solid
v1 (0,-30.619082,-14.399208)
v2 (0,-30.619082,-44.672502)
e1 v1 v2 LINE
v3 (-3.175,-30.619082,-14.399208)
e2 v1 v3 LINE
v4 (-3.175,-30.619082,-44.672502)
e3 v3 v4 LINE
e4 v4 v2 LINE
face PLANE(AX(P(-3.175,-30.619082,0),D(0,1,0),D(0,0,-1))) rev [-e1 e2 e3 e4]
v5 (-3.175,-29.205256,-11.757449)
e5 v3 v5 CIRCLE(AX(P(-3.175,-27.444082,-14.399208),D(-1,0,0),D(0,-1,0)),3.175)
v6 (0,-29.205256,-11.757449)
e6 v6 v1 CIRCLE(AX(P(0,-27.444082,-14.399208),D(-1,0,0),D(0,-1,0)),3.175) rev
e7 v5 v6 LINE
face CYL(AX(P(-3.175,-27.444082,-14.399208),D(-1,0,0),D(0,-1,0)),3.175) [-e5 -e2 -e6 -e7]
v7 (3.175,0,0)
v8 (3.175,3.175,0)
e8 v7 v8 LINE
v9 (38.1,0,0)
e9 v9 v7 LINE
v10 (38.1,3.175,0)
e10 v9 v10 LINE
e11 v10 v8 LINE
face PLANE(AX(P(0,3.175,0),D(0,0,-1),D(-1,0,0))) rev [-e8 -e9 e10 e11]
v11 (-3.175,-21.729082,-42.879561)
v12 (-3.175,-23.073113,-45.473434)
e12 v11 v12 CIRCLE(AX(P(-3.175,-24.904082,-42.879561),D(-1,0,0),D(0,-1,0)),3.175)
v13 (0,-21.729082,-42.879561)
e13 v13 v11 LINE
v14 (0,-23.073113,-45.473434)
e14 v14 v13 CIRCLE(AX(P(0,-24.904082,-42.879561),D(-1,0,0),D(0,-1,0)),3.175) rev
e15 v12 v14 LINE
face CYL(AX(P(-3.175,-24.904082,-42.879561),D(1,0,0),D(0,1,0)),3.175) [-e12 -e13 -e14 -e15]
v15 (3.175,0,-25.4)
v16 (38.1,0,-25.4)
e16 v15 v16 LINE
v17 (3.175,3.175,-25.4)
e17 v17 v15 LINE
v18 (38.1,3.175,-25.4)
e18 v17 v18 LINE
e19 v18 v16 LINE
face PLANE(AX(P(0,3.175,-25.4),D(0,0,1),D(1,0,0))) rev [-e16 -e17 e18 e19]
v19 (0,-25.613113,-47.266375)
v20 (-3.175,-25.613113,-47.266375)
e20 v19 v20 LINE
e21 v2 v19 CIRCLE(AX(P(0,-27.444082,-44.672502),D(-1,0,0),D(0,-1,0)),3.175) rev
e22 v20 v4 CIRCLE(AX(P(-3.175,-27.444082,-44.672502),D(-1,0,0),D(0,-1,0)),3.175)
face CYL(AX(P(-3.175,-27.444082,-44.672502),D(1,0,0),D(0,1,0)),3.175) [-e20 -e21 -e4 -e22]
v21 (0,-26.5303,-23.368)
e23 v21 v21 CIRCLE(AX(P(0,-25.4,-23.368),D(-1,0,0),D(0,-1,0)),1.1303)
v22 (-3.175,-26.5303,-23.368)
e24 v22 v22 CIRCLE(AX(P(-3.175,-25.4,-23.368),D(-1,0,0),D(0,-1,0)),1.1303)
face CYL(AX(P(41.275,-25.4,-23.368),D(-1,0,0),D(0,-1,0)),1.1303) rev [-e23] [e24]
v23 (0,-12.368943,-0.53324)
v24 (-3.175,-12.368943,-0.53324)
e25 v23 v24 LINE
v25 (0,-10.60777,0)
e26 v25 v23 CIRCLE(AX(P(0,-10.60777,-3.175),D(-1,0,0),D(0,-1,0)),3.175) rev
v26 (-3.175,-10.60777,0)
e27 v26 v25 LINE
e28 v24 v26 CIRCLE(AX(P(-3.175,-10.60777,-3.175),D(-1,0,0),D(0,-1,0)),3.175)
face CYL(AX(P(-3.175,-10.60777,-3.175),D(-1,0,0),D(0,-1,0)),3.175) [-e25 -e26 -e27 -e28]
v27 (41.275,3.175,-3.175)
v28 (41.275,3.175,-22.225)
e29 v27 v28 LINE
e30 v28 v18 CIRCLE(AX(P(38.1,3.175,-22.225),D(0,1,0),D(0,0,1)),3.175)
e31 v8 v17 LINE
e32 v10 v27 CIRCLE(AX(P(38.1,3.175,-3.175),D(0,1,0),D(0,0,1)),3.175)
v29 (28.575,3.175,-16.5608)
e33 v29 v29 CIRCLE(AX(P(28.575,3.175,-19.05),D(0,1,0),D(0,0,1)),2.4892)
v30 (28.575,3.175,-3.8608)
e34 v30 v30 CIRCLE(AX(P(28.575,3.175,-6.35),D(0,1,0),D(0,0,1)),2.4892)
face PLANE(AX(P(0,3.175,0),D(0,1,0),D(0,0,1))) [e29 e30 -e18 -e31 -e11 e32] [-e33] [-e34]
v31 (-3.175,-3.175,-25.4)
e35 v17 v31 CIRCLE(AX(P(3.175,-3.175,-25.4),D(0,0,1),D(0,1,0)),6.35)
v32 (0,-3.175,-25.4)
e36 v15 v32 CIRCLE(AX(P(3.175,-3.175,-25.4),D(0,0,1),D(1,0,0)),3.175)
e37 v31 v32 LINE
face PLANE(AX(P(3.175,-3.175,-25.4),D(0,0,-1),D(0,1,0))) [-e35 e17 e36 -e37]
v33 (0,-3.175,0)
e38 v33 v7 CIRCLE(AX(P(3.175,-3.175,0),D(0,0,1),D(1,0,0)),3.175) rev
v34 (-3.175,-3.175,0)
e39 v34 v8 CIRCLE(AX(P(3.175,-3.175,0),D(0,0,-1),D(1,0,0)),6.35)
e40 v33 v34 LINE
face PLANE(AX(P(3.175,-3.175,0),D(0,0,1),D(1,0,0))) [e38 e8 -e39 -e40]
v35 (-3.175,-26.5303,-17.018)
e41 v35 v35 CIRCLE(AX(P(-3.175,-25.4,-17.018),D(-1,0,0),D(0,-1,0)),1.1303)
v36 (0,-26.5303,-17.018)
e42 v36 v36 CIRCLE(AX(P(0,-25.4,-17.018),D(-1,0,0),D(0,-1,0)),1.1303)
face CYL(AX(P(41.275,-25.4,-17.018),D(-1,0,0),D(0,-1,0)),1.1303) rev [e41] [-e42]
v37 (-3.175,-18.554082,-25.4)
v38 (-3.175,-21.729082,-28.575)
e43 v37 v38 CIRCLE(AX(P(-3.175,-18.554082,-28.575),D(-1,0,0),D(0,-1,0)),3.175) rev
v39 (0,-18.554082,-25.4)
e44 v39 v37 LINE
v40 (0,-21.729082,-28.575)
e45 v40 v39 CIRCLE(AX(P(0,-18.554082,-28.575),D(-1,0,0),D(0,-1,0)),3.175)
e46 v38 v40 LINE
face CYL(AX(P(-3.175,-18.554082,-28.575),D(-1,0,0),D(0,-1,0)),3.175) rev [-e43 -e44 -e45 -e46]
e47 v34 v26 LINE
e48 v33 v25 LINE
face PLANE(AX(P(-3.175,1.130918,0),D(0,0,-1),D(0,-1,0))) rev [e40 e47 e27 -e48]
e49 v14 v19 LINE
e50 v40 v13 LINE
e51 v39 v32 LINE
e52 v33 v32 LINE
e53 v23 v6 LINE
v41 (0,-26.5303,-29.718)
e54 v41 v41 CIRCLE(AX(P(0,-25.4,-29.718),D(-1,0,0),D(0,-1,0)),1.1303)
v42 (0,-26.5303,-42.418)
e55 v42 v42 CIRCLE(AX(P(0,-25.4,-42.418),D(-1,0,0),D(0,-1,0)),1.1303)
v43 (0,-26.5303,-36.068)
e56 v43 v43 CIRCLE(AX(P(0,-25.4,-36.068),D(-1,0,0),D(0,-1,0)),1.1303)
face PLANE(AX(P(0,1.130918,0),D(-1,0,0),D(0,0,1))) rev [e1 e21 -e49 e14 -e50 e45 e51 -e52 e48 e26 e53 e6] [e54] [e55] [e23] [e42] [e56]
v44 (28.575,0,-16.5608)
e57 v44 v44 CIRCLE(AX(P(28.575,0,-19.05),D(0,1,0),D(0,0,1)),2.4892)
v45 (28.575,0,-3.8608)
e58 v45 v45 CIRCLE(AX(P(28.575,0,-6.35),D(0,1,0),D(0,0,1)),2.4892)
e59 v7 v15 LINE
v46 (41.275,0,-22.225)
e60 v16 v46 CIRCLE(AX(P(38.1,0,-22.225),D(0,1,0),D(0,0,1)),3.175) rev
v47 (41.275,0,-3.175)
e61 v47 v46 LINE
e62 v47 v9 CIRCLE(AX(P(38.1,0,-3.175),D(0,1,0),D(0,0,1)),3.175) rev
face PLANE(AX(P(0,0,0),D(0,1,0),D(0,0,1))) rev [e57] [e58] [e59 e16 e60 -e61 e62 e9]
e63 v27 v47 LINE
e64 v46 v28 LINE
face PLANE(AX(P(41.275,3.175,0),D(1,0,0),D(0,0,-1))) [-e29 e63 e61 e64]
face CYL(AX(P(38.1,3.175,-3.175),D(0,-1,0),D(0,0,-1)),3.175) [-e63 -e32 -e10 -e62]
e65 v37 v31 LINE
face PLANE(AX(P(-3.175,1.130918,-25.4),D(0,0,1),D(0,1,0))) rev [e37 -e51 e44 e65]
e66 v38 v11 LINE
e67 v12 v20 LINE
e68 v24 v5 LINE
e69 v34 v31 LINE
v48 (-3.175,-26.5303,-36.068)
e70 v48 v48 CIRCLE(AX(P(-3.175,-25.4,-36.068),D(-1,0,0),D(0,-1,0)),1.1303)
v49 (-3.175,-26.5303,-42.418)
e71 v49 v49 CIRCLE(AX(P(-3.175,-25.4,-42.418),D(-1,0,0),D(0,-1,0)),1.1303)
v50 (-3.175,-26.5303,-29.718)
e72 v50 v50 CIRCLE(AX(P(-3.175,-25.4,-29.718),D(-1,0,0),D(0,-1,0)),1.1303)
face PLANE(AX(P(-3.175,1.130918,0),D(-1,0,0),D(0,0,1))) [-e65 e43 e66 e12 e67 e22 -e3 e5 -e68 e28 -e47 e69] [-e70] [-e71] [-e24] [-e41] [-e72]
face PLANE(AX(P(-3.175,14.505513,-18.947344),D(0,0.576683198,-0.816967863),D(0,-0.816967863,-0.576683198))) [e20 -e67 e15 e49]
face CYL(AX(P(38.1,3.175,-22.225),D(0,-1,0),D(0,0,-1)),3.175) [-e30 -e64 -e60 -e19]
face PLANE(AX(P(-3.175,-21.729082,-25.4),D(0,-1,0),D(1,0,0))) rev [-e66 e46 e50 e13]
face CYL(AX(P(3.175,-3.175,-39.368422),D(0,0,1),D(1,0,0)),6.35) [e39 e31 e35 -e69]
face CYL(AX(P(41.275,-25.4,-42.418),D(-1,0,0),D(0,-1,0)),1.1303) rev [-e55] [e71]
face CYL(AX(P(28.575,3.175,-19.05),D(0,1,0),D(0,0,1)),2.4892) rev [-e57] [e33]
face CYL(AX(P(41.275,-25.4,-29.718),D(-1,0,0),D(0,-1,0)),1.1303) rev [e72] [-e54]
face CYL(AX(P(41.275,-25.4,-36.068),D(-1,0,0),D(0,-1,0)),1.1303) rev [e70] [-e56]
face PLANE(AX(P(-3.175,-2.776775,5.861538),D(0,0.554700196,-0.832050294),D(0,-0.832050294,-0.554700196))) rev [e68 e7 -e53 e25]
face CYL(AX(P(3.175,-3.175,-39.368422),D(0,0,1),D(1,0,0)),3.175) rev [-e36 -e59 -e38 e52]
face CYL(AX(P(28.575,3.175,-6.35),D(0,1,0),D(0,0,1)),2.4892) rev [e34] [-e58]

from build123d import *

# Parameters (mm, degrees)
SKETCH1_R                  = 2.4892
BOSS_EXTRUDE1_DEPTH        = 3.175
SKETCHED_START             = -52
SKETCHED_BEND2_DEPTH       = 52
SKETCHED_START_2           = -25.4
SKETCHED_BEND2_2_DEPTH     = 12.7
SKETCHED_START_3           = -41.835294118
SKETCHED_BEND2_3_OUTLINE_W = 3.175
SKETCHED_BEND2_3_OUTLINE_H = 12.7
SKETCHED_BEND2_3_DEPTH     = 16.435294118
SKETCHED_BEND2_4_DEPTH     = 20.459192
SKETCHED_START_4           = -50.8
SKETCHED_BEND2_5_OUTLINE_W = 3.175
SKETCHED_BEND2_5_OUTLINE_H = 12.7
SKETCHED_BEND2_5_DEPTH     = 48.117252
SKETCHED_START_5           = -4.940808
SKETCHED_BEND2_6_DEPTH     = 4.940808
SKETCHED_START_6           = -3.175
SKETCHED_BEND2_7_DEPTH     = 3.175
SKETCH13_R                 = 1.1303
CUT_EXTRUDE2_DEPTH         = 75.121324278
FILLET1_R                  = 3.175
SKETCH14_W                 = 20.670157998
SKETCH14_H                 = 6.985
CUT_EXTRUDE3_DEPTH         = 71.21778451
FILLET2_R                  = 3.175


with BuildPart() as part:
    # Sketch1 → Boss-Extrude1 (new body)
    # profile 1 of 2: a face of its own
    with BuildSketch(Plane(origin=(0, 0, 0), x_dir=(1, 0, 0), z_dir=(0, 1, 0))):
        Polygon((6.35, 0), (25.4, 0), (28.575, 0), (41.275, 0), (41.275, 25.4), (27.523477182, 25.4), (14.823477182, 25.4), (6.35, 25.4), align=None)
        with Locations(Location((28.575, 6.35, 0), (0, 0, 270))):
            Circle(SKETCH1_R, mode=Mode.SUBTRACT)
        with Locations(Location((28.575, 19.05, 0), (0, 0, 270))):
            Circle(SKETCH1_R, mode=Mode.SUBTRACT)
    # profile 2 of 2: a face of its own
    with BuildSketch(Plane(origin=(0, 0, 0), x_dir=(1, 0, 0), z_dir=(0, 1, 0))):
        Polygon((-12.7, 0), (6.35, 0), (6.35, 25.4), (0, 25.4), (-19.05, 25.4), (-19.05, 41.835294118), (-23.415467049, 44.91680027), (-31.75, 50.8), (-31.75, 12.7), (-23.415467049, 7.143644699), align=None)
    extrude(amount=BOSS_EXTRUDE1_DEPTH)

    # Sketched Bend2: read off the stored shape, not the designer's step
    # Sketched Bend2 outline → Sketched Bend2 (cut)
    with BuildSketch(Plane.XY.offset(SKETCHED_START)):
        with BuildLine():
            ThreePointArc((-2.324261315, 0), (-1e-09, 2.324261314), (3.175, 3.175))
            Line((3.175, 3.175), (-31.75, 3.175))
            Line((-31.75, 3.175), (-31.75, 0))
            Line((-31.75, 0), (-2.324261315, 0))
        make_face()
    extrude(amount=SKETCHED_BEND2_DEPTH, mode=Mode.SUBTRACT)

    # Sketched Bend2 2 outline → Sketched Bend2 2 (add)
    with BuildSketch(Plane.XY.offset(SKETCHED_START_2)):
        with BuildLine():
            ThreePointArc((-2.324261315, 0), (-2.958628997, -1.531499064), (-3.175, -3.175))
            Line((-3.175, -3.175), (-3.175, -30.619082494))
            Line((-3.175, -30.619082494), (0, -30.619082494))
            Line((0, -30.619082494), (0, -3.175))
            ThreePointArc((0, -3.175), (0.92993597, -0.92993597), (3.175, 0))
            Line((3.175, 0), (-2.324261315, 0))
        make_face()
    extrude(amount=SKETCHED_BEND2_2_DEPTH)

    # Sketched Bend2 3 outline → Sketched Bend2 3 (add)
    with BuildSketch(Plane.XY.offset(SKETCHED_START_3)):
        with Locations((-1.5875, -24.269082494)):
            Rectangle(SKETCHED_BEND2_3_OUTLINE_W, SKETCHED_BEND2_3_OUTLINE_H)
    extrude(amount=SKETCHED_BEND2_3_DEPTH)

    # Sketched Bend2 4 outline → Sketched Bend2 4 (add)
    with BuildSketch(Plane.XY.offset(SKETCHED_START_2)):
        with BuildLine():
            ThreePointArc((-2.324261315, 0), (-2.958628997, -1.531499064), (-3.175, -3.175))
            Line((-3.175, -3.175), (-3.175, -17.919082494))
            Line((-3.175, -17.919082494), (0, -17.919082494))
            Line((0, -17.919082494), (0, -3.175))
            ThreePointArc((0, -3.175), (0.92993597, -0.92993597), (3.175, 0))
            Line((3.175, 0), (-2.324261315, 0))
        make_face()
    extrude(amount=SKETCHED_BEND2_4_DEPTH)

    # Sketched Bend2 5 outline → Sketched Bend2 5 (add)
    with BuildSketch(Plane.XY.offset(SKETCHED_START_4)):
        with Locations((-1.5875, -24.269082494)):
            Rectangle(SKETCHED_BEND2_5_OUTLINE_W, SKETCHED_BEND2_5_OUTLINE_H)
    extrude(amount=SKETCHED_BEND2_5_DEPTH)

    # Sketched Bend2 6 outline → Sketched Bend2 6 (add)
    with BuildSketch(Plane.XY.offset(SKETCHED_START_5)):
        with BuildLine():
            ThreePointArc((-2.324261315, 0), (-2.958628997, -1.531499064), (-3.175, -3.175))
            Line((-3.175, -3.175), (-3.175, -17.919082494))
            Line((-3.175, -17.919082494), (0, -17.919082494))
            Line((0, -17.919082494), (0, -3.175))
            ThreePointArc((0, -3.175), (0.92993597, -0.92993597), (3.175, 0))
            Line((3.175, 0), (-2.324261315, 0))
        make_face()
    extrude(amount=SKETCHED_BEND2_6_DEPTH)

    # Sketched Bend2 7 outline → Sketched Bend2 7 (cut)
    with BuildSketch(Plane.YZ.offset(SKETCHED_START_6)):
        Polygon((-30.619082494, -2.682748), (-30.619082494, -12.7), (-11.569082494, 0), (-17.919082494, 0), (-17.919082494, -2.682748), align=None)
        Polygon((-17.919082494, -41.835294118), (-30.619082494, -50.8), (-17.919082494, -50.8), align=None)
    extrude(amount=SKETCHED_BEND2_7_DEPTH, mode=Mode.SUBTRACT)

    # Sketch13 → Cut-Extrude2 (cut, through all)
    with BuildSketch(Plane.ZY.offset(3.175)):
        with Locations(Location((-17.018, -25.4, 0), (0, 0, 270))):
            Circle(SKETCH13_R)
        with Locations(Location((-23.368, -25.4, 0), (0, 0, 270))):
            Circle(SKETCH13_R)
        with Locations(Location((-29.718, -25.4, 0), (0, 0, 270))):
            Circle(SKETCH13_R)
        with Locations(Location((-36.068, -25.4, 0), (0, 0, 270))):
            Circle(SKETCH13_R)
        with Locations(Location((-42.418, -25.4, 0), (0, 0, 270))):
            Circle(SKETCH13_R)
    extrude(amount=-CUT_EXTRUDE2_DEPTH, mode=Mode.SUBTRACT)

    # Fillet1
    fillet1_edges = [part.edges().sort_by_distance(p)[0] for p in [
        (-1.5875, -17.919082494, -41.835294118),
        (-1.5875, -17.919082494, -25.4),
        (-1.5875, -11.569082494, 0),
        (-1.5875, -30.619082494, -12.7),
        (-1.5875, -30.619082494, -50.8),
        (41.275, 1.5875, -25.4),
        (41.275, 1.5875, 0),
    ]]
    fillet(fillet1_edges, radius=FILLET1_R)

    # Sketch14 → Cut-Extrude3 (cut, through all)
    with BuildSketch(Plane(origin=(0, 0, 0), x_dir=(0, 0, -1), z_dir=(1, 0, 0))):
        with Locations((35.735078999, -18.236582494)):
            Rectangle(SKETCH14_W, SKETCH14_H)
    extrude(amount=-CUT_EXTRUDE3_DEPTH, mode=Mode.SUBTRACT)

    # Fillet2
    fillet2_edges = [part.edges().sort_by_distance(p)[0] for p in [
        (-1.5875, -21.729082494, -44.524705882),
        (-1.5875, -21.729082494, -25.4),
    ]]
    fillet(fillet2_edges, radius=FILLET2_R)


solid = part.part
